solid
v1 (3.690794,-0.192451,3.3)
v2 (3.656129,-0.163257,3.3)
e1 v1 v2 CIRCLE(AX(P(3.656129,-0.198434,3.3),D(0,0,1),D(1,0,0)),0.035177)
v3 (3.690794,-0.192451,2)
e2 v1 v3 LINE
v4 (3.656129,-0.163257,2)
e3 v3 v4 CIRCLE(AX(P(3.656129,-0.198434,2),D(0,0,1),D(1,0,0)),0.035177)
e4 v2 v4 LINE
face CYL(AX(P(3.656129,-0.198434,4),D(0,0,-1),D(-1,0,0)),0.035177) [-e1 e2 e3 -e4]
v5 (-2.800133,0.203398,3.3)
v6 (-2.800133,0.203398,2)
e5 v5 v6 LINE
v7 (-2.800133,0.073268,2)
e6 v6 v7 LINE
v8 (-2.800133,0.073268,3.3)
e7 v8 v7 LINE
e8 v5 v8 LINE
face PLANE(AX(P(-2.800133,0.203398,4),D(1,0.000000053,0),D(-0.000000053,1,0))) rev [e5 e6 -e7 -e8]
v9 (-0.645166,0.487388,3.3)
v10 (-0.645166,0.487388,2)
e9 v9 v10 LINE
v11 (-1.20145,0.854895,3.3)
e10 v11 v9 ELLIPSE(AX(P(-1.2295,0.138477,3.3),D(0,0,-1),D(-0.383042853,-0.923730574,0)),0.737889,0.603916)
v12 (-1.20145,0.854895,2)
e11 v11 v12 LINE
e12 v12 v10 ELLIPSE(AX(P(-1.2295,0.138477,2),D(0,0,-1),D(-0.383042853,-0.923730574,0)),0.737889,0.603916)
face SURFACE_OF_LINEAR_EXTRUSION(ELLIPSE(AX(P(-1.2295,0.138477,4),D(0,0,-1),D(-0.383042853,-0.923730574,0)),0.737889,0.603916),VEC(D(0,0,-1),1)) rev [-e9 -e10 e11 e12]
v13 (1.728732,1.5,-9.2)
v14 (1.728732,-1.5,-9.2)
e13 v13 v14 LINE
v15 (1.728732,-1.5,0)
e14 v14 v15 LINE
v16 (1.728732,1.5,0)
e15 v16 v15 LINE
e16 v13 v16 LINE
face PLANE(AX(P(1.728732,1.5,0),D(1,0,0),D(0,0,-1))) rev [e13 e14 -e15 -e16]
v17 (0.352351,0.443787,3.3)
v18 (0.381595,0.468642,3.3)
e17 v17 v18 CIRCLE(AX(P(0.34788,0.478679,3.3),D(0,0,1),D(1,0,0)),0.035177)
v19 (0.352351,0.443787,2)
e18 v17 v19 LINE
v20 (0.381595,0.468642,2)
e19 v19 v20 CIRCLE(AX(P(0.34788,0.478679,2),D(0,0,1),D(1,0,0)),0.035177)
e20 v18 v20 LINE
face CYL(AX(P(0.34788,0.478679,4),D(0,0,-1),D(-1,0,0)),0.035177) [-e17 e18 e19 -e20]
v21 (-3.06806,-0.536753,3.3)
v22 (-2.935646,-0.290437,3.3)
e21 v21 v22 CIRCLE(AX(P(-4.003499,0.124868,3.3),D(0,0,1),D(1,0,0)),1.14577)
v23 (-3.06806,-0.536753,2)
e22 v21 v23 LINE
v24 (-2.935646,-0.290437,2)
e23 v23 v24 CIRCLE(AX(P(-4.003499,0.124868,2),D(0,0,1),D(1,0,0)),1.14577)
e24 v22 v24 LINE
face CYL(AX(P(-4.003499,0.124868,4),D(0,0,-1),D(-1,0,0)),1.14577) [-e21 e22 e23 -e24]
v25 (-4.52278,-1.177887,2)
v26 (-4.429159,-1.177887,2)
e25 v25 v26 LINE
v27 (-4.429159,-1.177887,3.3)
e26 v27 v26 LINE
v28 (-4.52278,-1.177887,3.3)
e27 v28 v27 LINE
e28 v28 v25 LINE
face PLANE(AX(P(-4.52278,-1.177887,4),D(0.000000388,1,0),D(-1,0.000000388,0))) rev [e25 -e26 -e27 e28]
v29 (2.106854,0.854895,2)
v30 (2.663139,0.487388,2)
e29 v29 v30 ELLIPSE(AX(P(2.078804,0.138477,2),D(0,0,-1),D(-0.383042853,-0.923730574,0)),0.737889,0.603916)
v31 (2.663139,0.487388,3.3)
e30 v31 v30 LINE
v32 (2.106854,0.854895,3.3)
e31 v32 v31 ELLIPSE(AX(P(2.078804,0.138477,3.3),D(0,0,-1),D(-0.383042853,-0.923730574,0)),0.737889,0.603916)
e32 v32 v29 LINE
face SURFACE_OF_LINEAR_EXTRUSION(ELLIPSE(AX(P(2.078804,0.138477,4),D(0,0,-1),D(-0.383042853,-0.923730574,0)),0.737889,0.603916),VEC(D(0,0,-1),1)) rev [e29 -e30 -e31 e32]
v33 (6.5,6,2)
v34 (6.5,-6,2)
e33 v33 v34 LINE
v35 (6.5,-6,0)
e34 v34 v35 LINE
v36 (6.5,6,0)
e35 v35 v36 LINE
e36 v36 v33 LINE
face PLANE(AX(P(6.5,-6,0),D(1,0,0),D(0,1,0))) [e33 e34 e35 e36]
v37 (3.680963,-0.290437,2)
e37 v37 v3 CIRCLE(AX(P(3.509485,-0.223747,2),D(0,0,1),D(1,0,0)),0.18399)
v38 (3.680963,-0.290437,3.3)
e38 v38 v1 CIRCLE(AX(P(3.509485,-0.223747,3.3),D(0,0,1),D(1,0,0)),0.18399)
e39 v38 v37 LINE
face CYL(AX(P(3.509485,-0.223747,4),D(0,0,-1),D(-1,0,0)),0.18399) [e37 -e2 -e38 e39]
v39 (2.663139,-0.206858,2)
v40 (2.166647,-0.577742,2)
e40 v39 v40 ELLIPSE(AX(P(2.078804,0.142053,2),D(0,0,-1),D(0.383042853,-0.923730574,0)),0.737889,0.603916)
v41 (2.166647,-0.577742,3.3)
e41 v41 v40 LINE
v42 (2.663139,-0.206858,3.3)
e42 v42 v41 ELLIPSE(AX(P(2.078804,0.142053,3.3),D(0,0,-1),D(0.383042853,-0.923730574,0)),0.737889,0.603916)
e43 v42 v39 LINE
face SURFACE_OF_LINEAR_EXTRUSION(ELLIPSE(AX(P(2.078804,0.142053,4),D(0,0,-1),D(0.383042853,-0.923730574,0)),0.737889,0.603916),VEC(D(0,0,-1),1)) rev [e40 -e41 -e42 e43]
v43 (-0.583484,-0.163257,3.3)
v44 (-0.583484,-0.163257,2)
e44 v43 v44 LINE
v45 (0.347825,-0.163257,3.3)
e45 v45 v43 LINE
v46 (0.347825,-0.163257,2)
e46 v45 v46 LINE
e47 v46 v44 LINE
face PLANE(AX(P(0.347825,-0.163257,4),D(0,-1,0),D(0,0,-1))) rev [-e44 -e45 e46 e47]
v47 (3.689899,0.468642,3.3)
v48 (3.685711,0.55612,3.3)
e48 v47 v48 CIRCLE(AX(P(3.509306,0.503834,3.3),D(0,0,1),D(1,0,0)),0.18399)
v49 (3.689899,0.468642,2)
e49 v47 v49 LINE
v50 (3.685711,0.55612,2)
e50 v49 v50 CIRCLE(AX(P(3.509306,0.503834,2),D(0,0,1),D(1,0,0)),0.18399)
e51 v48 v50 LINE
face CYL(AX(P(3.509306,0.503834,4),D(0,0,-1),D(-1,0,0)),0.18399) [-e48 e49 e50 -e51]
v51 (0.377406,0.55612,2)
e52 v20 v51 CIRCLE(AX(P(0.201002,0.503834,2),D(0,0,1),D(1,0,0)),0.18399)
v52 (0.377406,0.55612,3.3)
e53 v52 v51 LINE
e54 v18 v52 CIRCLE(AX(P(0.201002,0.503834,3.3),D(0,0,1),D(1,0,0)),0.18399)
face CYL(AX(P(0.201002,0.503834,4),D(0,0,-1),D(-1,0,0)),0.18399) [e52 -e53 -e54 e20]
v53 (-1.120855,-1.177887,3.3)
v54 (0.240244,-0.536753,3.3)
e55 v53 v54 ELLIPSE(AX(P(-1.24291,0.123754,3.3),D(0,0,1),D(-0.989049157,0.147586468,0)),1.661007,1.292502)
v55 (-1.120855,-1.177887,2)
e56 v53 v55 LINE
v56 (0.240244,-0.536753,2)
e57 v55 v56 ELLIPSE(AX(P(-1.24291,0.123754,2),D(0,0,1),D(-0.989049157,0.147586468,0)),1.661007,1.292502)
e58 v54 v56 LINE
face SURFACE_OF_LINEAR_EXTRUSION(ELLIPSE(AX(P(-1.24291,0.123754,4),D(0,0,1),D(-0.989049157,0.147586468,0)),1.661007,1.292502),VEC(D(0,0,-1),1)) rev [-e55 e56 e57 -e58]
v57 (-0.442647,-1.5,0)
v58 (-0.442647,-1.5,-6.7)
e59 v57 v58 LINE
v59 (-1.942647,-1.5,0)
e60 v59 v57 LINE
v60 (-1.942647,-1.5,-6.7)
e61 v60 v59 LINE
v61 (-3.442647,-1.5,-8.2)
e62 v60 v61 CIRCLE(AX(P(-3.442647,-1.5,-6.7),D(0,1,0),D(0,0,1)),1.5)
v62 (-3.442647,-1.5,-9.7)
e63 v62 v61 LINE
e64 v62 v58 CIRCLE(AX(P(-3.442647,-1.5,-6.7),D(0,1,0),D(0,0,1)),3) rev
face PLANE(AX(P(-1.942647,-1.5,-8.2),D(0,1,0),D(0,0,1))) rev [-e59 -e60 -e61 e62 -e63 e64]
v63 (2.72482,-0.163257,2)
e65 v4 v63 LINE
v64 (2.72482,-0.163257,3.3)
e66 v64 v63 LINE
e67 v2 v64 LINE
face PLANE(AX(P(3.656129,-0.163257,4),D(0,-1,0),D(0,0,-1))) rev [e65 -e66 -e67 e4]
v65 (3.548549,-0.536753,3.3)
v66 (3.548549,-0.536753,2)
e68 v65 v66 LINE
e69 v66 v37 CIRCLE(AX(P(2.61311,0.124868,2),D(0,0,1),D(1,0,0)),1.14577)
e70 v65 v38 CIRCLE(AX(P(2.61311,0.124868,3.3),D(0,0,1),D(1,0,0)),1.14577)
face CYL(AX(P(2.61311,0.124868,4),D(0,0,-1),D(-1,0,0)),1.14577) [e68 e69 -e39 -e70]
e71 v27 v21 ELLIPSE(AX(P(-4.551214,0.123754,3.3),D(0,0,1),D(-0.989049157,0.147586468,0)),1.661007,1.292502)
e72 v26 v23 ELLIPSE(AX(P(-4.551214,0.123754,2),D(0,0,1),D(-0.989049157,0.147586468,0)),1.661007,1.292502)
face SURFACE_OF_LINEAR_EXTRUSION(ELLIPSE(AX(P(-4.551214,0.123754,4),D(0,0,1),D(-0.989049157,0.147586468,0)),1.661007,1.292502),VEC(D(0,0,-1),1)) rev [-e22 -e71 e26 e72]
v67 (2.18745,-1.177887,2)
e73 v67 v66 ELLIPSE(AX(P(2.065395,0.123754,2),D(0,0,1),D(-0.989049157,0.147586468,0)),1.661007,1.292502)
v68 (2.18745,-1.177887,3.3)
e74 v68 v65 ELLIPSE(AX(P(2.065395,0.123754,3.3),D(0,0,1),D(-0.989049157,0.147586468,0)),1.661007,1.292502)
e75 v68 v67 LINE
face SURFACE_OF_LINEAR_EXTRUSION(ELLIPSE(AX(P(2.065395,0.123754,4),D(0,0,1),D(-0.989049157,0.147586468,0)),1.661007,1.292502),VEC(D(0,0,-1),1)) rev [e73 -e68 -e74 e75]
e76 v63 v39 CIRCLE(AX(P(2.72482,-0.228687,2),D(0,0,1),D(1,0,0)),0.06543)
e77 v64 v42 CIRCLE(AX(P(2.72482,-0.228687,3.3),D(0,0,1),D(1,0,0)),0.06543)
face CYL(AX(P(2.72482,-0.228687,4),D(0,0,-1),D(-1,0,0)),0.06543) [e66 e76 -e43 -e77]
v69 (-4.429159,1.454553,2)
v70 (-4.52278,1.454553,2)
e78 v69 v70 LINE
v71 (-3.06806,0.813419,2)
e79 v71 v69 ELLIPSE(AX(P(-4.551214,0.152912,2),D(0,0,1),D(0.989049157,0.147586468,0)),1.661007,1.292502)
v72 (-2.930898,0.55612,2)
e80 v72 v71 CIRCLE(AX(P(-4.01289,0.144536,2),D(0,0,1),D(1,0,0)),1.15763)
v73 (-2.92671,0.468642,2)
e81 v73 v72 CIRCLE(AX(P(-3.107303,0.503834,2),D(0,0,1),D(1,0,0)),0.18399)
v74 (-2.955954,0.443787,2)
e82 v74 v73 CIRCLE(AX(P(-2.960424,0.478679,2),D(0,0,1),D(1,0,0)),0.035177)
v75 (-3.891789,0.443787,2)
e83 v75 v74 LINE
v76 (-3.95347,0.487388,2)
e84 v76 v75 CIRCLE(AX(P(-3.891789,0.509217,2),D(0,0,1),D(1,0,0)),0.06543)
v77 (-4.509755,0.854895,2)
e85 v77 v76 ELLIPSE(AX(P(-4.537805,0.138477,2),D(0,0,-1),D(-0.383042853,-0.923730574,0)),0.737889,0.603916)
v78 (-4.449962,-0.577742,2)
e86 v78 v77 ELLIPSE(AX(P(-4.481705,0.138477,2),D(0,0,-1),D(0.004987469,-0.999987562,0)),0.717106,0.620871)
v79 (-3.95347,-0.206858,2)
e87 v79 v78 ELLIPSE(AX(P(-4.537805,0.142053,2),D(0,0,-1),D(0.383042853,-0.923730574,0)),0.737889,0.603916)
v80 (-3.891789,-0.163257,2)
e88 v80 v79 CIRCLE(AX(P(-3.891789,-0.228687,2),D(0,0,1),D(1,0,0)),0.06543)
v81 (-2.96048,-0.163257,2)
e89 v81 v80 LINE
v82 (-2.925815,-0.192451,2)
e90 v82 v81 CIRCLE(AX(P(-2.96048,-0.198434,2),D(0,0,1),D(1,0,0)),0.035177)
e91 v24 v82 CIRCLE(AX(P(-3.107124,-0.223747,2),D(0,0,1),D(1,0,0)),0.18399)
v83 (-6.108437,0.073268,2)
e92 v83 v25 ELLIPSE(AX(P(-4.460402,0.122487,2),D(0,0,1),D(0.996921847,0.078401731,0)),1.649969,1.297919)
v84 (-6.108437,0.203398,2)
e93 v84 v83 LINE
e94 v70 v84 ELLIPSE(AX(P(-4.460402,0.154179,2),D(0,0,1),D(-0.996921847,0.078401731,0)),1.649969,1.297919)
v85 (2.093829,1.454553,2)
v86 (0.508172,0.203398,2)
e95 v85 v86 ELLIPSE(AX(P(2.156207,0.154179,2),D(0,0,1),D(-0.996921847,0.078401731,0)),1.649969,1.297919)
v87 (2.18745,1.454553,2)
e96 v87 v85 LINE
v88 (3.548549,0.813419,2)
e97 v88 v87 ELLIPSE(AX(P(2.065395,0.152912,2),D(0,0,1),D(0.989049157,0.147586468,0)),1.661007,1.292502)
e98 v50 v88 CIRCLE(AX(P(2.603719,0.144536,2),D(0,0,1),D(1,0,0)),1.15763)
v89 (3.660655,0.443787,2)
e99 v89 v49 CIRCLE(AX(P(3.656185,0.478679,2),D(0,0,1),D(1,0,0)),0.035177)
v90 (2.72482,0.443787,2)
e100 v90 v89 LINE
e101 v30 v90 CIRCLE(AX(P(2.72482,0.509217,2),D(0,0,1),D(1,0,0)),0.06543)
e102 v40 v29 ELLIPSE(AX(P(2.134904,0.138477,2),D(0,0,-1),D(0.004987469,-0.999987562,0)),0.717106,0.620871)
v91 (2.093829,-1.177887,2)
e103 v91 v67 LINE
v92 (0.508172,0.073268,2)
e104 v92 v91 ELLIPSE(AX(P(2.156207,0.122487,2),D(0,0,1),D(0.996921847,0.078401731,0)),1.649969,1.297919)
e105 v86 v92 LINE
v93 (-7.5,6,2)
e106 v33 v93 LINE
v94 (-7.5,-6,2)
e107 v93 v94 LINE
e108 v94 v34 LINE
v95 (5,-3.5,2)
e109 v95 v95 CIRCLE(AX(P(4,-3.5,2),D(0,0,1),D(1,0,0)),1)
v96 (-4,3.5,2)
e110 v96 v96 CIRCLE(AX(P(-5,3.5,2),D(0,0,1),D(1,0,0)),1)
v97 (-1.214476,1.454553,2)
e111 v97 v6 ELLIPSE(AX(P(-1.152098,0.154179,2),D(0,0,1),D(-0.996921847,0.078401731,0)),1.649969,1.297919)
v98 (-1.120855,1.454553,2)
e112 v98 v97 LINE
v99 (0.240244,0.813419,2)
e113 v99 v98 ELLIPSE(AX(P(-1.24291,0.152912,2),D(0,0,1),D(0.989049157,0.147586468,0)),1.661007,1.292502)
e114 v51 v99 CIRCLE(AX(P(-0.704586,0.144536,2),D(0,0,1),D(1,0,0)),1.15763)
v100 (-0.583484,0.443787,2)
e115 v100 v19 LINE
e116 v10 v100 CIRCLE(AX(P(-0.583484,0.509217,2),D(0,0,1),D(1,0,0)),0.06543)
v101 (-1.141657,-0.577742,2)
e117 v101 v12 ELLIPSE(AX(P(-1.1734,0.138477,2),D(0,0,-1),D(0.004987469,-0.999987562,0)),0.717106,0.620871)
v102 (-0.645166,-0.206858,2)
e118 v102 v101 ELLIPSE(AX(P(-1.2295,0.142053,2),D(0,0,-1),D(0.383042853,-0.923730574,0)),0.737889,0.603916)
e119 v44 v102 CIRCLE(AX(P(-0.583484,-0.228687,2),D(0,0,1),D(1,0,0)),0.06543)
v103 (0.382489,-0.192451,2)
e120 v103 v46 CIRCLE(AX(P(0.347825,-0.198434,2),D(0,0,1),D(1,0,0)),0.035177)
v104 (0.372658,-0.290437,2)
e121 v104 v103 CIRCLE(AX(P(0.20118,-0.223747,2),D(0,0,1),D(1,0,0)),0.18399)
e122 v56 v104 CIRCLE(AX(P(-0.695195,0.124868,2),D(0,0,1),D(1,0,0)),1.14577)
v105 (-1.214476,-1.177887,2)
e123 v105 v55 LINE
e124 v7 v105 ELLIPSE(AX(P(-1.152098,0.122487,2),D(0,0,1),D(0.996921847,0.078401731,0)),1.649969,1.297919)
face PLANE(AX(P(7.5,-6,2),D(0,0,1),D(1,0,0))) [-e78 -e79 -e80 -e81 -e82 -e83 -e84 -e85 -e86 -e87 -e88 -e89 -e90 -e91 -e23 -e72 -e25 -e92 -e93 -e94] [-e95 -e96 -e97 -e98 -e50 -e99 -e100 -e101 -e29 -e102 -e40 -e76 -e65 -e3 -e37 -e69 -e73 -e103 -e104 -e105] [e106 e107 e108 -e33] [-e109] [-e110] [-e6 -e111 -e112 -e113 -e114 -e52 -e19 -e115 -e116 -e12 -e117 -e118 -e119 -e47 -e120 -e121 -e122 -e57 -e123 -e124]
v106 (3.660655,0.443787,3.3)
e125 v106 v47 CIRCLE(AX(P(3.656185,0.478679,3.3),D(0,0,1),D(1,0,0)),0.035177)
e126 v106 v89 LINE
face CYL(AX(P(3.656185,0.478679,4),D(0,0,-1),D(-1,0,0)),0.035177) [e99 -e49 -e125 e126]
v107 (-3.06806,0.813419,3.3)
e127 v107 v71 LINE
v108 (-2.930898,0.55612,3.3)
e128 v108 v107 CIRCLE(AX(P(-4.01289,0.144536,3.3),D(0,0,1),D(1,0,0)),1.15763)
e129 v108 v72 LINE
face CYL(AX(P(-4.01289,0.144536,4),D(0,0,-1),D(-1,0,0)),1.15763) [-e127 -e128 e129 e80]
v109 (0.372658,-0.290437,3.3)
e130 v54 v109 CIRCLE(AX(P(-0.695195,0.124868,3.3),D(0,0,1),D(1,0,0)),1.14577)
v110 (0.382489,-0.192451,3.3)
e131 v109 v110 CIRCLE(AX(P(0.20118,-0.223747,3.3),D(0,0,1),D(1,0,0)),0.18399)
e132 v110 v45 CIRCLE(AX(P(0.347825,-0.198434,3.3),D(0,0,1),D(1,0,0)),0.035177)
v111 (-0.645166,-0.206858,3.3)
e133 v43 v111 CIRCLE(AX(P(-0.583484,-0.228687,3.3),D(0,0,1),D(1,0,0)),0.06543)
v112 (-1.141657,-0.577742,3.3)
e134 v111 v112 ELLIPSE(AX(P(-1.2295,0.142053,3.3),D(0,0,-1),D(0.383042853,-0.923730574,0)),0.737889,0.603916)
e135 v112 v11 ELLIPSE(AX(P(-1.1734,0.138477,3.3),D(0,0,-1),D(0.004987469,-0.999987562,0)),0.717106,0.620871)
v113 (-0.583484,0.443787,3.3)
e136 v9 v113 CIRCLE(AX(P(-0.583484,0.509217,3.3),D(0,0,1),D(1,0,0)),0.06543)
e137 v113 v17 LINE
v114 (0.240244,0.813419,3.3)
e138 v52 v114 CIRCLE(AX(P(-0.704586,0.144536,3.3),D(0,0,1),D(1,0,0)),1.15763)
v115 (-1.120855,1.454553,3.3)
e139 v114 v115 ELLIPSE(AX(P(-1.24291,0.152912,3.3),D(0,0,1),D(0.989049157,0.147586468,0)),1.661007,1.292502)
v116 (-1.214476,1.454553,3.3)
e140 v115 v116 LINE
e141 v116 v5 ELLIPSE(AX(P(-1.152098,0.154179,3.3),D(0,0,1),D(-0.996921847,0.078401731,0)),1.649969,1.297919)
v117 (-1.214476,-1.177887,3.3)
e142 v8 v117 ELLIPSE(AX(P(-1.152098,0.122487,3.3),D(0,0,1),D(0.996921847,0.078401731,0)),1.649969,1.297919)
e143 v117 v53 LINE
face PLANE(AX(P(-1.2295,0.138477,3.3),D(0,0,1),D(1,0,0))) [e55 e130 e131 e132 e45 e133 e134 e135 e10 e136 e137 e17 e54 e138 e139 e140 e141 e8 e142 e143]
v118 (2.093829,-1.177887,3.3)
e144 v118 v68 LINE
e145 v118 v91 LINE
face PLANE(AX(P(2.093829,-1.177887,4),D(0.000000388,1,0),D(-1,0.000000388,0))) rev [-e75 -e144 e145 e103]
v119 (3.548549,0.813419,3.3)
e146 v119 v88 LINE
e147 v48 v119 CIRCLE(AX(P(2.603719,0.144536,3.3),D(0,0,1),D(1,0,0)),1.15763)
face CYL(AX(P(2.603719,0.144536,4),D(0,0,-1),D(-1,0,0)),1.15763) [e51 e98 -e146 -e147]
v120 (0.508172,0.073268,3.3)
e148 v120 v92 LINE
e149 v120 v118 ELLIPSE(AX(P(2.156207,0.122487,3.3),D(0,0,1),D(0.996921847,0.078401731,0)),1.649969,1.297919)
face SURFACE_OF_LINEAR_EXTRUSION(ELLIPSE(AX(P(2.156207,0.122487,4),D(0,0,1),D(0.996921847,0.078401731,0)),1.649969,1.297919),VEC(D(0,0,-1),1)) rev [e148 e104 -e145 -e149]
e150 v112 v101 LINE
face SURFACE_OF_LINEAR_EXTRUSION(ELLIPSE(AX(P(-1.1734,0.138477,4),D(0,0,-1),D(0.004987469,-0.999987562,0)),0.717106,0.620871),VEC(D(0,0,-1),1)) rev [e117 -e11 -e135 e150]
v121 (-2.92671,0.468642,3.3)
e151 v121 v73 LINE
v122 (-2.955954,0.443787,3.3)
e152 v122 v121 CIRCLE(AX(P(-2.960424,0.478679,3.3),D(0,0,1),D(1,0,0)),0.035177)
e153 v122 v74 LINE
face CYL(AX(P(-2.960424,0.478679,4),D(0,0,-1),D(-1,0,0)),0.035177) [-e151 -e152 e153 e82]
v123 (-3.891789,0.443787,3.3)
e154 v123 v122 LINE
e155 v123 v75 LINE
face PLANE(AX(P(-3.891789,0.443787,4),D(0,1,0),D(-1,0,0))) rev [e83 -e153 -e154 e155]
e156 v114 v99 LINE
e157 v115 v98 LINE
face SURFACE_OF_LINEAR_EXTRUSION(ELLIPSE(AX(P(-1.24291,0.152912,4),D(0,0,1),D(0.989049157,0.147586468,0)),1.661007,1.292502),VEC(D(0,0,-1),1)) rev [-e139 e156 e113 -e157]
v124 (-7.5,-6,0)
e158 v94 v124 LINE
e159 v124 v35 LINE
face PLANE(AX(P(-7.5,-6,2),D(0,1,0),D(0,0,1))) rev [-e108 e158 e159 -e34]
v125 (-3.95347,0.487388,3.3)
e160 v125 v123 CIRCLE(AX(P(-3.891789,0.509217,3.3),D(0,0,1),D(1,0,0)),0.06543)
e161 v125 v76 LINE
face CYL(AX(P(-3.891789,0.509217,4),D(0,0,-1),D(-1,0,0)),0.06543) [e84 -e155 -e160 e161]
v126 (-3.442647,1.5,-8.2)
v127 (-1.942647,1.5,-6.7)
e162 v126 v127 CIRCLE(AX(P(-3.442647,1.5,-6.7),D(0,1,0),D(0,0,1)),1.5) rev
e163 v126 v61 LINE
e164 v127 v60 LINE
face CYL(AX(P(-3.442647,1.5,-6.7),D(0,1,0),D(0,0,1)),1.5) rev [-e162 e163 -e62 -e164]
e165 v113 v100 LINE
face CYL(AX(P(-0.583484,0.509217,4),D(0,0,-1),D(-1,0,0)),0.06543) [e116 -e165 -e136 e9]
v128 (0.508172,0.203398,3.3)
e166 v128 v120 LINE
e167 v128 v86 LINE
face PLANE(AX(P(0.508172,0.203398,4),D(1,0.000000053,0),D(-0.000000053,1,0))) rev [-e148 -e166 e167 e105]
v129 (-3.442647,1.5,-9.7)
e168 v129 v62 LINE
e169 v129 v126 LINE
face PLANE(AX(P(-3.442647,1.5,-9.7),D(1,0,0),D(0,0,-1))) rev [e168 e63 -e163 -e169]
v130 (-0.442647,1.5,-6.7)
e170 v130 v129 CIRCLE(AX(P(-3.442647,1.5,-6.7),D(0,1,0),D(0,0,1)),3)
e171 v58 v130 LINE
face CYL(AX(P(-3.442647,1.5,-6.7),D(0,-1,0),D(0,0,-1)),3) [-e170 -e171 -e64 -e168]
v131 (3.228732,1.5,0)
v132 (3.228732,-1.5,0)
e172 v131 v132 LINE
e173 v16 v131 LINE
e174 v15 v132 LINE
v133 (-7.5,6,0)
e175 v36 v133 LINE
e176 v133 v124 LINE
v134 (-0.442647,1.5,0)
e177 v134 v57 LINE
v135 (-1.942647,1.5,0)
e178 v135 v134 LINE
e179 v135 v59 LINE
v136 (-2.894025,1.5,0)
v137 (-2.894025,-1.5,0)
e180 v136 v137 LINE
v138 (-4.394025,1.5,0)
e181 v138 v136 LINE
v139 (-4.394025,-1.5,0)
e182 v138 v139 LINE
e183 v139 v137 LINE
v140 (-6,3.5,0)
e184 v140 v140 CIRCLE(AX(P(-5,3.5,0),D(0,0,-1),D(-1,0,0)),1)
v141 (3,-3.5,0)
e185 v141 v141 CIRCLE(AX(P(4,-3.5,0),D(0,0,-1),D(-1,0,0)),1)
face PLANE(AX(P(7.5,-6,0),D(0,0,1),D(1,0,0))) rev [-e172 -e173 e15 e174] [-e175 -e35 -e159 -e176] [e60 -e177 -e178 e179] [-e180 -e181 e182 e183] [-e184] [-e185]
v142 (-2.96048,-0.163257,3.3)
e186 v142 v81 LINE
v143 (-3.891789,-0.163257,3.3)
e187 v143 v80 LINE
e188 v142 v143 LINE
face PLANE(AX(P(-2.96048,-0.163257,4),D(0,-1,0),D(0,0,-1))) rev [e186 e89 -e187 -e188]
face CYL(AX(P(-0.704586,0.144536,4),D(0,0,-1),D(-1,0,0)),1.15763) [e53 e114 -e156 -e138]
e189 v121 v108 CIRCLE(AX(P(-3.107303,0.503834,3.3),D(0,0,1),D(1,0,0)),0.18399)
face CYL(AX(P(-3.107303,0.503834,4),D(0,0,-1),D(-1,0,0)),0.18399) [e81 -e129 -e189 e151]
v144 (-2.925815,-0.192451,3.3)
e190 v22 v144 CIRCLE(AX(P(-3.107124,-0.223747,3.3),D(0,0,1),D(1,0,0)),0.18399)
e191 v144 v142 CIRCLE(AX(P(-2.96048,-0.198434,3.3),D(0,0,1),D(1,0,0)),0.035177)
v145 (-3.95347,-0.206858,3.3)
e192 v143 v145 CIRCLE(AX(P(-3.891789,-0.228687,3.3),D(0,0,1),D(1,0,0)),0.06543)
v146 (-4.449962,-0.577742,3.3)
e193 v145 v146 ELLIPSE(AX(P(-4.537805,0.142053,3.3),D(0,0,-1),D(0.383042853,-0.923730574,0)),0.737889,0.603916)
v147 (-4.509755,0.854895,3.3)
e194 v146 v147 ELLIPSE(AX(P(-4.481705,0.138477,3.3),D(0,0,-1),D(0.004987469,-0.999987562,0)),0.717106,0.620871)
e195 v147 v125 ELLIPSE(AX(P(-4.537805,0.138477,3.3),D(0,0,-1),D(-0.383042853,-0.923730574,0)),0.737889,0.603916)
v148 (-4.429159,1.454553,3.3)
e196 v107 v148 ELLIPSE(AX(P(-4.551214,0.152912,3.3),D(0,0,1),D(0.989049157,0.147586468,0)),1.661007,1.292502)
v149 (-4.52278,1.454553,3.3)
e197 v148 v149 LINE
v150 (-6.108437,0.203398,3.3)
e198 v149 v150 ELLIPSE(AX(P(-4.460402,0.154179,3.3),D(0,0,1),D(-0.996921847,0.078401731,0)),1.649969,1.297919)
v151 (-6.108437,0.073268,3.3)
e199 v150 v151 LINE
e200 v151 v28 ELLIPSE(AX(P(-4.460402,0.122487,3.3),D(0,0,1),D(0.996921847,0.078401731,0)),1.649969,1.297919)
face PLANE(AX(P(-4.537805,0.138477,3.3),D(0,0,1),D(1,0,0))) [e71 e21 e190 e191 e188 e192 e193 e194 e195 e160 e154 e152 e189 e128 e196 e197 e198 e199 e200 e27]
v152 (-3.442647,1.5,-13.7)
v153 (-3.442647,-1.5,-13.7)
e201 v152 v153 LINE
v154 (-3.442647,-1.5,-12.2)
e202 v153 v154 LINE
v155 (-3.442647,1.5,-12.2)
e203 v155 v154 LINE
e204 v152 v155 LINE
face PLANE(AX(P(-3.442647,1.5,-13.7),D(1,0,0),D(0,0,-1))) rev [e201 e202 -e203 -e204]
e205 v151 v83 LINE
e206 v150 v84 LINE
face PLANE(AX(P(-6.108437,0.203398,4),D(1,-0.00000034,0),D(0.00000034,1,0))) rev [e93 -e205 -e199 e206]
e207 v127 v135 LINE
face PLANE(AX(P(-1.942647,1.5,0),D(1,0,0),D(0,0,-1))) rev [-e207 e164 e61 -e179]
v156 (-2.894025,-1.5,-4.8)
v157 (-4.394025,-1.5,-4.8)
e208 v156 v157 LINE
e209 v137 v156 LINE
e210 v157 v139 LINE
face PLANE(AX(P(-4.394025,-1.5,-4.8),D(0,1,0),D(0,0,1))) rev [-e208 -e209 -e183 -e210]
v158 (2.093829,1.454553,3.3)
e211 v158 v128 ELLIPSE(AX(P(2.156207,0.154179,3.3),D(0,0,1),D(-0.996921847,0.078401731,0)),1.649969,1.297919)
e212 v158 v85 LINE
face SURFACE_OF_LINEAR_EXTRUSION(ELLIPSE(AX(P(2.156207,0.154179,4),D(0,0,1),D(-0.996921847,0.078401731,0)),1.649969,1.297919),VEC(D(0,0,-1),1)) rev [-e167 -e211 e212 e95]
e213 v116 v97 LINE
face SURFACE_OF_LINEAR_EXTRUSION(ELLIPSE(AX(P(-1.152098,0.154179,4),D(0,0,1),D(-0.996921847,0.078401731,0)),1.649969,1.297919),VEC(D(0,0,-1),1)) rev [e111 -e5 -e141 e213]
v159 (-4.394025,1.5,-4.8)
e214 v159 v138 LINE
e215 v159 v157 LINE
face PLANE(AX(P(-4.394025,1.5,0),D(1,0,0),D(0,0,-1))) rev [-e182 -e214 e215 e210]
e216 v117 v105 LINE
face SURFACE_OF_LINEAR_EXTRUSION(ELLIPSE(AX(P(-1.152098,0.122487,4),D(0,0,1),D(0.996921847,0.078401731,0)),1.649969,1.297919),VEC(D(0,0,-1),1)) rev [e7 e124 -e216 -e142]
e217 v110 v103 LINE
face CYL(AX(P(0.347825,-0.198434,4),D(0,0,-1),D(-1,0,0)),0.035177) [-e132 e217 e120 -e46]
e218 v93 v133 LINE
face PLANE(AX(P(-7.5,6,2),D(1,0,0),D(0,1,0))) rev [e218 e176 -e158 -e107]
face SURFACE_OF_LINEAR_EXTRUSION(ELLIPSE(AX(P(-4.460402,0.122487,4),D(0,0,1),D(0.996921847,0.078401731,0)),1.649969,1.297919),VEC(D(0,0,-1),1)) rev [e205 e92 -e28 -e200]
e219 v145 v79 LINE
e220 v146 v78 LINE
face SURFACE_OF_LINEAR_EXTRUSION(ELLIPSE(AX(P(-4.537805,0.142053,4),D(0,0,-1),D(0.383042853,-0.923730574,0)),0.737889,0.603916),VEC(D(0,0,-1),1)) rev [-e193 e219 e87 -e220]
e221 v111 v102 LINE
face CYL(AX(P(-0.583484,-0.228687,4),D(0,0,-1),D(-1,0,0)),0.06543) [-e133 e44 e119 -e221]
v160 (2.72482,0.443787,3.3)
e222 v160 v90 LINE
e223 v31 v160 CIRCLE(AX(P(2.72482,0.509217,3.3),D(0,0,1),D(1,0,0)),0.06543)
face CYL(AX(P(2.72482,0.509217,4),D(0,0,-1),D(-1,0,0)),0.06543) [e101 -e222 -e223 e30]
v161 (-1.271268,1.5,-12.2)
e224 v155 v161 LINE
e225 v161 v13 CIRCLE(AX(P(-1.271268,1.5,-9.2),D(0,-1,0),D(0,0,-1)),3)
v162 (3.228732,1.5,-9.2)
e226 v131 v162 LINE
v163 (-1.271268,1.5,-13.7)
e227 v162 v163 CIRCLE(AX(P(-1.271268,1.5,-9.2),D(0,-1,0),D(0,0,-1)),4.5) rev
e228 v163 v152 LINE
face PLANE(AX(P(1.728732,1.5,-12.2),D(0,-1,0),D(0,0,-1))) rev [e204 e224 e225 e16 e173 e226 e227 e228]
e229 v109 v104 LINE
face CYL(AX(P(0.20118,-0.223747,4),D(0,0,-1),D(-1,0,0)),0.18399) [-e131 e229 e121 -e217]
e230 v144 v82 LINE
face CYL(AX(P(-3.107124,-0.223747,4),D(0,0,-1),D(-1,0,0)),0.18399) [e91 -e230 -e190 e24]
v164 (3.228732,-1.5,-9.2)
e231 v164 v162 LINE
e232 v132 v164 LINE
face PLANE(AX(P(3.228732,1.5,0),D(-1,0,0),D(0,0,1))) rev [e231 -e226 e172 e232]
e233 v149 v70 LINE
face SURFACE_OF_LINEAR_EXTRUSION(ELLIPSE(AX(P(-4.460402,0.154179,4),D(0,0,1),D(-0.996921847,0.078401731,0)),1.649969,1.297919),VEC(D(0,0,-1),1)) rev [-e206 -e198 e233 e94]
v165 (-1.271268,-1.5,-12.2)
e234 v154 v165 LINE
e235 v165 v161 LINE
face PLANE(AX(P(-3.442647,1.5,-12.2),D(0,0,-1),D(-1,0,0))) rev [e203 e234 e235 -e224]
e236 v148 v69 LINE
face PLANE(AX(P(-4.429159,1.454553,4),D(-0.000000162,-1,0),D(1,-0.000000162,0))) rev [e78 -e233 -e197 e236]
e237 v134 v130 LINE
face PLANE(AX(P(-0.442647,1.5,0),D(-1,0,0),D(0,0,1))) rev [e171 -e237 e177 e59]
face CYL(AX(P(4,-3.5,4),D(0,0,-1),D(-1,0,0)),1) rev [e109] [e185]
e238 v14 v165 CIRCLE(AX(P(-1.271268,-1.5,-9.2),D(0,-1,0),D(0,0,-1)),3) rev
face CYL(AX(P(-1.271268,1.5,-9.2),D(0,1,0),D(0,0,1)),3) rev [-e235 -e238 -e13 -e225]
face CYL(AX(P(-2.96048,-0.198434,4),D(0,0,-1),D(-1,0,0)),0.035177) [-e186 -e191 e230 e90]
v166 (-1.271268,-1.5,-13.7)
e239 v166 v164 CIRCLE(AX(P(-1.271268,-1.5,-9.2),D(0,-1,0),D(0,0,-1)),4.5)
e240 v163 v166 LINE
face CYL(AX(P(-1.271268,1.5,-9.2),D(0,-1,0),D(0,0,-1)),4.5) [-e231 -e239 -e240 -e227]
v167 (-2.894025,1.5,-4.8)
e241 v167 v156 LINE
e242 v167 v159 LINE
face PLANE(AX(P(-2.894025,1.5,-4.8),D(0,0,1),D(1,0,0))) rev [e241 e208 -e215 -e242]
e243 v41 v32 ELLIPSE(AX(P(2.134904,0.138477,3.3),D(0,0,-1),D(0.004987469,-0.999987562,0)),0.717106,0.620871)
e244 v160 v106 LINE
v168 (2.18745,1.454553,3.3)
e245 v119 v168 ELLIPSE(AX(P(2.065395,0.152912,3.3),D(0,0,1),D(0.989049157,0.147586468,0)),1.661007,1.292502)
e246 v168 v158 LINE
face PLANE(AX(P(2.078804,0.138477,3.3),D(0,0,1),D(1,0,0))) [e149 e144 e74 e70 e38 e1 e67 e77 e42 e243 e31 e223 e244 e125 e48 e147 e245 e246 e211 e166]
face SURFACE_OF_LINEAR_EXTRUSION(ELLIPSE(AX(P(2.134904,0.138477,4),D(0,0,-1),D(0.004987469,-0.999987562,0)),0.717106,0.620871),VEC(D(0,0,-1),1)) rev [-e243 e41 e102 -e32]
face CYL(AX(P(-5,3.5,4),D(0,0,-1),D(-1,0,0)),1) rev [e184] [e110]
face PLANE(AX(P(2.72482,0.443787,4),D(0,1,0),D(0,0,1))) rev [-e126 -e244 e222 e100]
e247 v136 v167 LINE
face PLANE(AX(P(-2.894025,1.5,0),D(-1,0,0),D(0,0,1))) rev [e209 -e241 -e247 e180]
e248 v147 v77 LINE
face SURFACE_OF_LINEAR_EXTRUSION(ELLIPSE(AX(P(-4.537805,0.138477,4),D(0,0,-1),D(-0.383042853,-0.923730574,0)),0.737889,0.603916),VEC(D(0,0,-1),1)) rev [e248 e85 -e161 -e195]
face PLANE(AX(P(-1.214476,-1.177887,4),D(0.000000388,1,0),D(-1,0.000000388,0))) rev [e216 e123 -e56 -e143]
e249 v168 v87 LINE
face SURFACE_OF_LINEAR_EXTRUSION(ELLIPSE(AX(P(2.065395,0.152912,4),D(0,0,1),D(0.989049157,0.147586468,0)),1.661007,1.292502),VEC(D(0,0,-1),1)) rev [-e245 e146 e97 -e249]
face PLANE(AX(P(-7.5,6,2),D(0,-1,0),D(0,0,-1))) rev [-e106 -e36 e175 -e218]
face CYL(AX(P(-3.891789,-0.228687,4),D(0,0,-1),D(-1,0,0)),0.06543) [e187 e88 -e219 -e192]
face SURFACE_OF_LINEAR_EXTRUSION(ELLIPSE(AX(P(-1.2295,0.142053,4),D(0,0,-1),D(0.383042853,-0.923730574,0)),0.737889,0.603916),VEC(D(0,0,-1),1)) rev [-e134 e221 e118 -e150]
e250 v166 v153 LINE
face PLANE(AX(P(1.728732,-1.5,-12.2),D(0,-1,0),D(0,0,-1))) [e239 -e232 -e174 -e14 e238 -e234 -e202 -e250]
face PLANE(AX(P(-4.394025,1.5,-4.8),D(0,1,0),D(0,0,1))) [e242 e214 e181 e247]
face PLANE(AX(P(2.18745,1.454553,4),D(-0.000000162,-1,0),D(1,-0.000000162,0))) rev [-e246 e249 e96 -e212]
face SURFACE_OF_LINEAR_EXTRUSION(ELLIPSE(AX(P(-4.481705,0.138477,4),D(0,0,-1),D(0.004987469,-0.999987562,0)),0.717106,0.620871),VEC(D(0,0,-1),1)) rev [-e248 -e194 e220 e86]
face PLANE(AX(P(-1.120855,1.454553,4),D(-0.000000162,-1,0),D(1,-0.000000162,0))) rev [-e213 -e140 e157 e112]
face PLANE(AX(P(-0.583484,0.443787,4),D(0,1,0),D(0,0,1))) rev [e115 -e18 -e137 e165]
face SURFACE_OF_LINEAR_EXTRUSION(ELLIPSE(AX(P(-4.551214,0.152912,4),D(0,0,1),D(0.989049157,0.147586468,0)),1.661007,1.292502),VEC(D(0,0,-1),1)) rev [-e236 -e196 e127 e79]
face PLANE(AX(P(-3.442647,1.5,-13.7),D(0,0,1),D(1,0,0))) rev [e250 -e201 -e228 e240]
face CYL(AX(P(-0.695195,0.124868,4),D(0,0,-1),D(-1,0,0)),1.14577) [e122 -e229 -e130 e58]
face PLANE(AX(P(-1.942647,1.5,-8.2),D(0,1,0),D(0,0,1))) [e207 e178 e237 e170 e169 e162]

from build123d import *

# Parameters (mm, degrees)
SKETCH1_W           = 15
SKETCH1_H           = 12
BOSS_EXTRUDE1_DEPTH = 2
BOSS_EXTRUDE2_DEPTH = 2
SKETCH3_W           = 1.5
SKETCH3_H           = 4.8
BOSS_EXTRUDE3_DEPTH = 1.5
FILLET3_R           = 1.5
FILLET4_R           = 3
FILLET5_R           = 3
FILLET6_R           = 4.5
SKETCH4_W           = 2
SKETCH4_H           = 12
CUT_EXTRUDE1_DEPTH  = 1
SKETCH5_R           = 1
CUT_EXTRUDE2_DEPTH  = 17.731407672
CUT_EXTRUDE3_START  = -0.7
CUT_EXTRUDE3_DEPTH  = 0.7


with BuildPart() as part:
    # Sketch1 → Boss-Extrude1 (new body)
    with BuildSketch(Plane.XY):
        Rectangle(SKETCH1_W, SKETCH1_H)
    extrude(amount=BOSS_EXTRUDE1_DEPTH)

    # Sketch2 → Boss-Extrude2 (add)
    with BuildSketch(Plane.XY.offset(2)):
        with BuildLine():
            Line((-0.583484164, 0.443787032), (0.352350759, 0.443787032))
            ThreePointArc((0.352350759, 0.443787032), (0.370660979, 0.451874829), (0.381594807, 0.468641703))
            ThreePointArc((0.381594807, 0.468641703), (0.38478126, 0.512633483), (0.377406248, 0.556119567))
            ThreePointArc((0.377406248, 0.556119567), (0.316958398, 0.689104808), (0.240244136, 0.81341868))
            add(Edge.make_bspline(
                [(0.240244136, 0.81341868), (-0.178053426, 1.454553053), (-1.120854898, 1.454553053)],
                knots=[3.484341046, 3.484341046, 3.484341046, 4.522924348, 4.522924348, 4.522924348], degree=2, weights=[1, 0.868170926, 1]))
            Line((-1.120854898, 1.454553053), (-1.214475951, 1.454553068))
            add(Edge.make_bspline(
                [(-1.214475951, 1.454553068), (-2.800132813, 1.454553068), (-2.800132813, 0.203397992)],
                knots=[1.670440536, 1.670440536, 1.670440536, 3.203377674, 3.203377674, 3.203377674], degree=2, weights=[1, 0.720364542, 1]))
            Line((-2.800132813, 0.203397992), (-2.800132806, 0.073267738))
            add(Edge.make_bspline(
                [(-2.800132806, 0.073267738), (-2.800132806, -1.177887338), (-1.214475944, -1.177887338)],
                knots=[3.079807634, 3.079807634, 3.079807634, 4.612744771, 4.612744771, 4.612744771], degree=2, weights=[1, 0.720364542, 1]))
            Line((-1.214475944, -1.177887338), (-1.120854891, -1.177887375))
            add(Edge.make_bspline(
                [(-1.120854891, -1.177887375), (-0.178053419, -1.177887375), (0.240244143, -0.536753002)],
                knots=[1.760260959, 1.760260959, 1.760260959, 2.798844261, 2.798844261, 2.798844261], degree=2, weights=[1, 0.868170926, 1]))
            ThreePointArc((0.240244143, -0.536753002), (0.313994237, -0.417650167), (0.372658208, -0.290437354))
            ThreePointArc((0.372658208, -0.290437354), (0.384251196, -0.24211404), (0.382489087, -0.192450825))
            ThreePointArc((0.382489087, -0.192450825), (0.370484527, -0.171527836), (0.347824512, -0.163257123))
            Line((0.347824512, -0.163257123), (-0.58348421, -0.163257123))
            ThreePointArc((-0.58348421, -0.163257123), (-0.62125204, -0.175257922), (-0.645165579, -0.206858093))
            add(Edge.make_bspline(
                [(-1.141657158, -0.577741646), (-0.776549247, -0.578100851), (-0.645165579, -0.206858093)],
                knots=[5.955155363, 5.955155363, 5.955155363, 7.020735545, 7.020735545, 7.020735545], degree=2, weights=[1, 0.86139323, 1]))
            add(Edge.make_bspline(
                [(-1.201450314, 0.854894524), (-1.823540048, 0.823436889), (-1.793554178, 0.104979402), (-1.763568309, -0.613478086), (-1.141657158, -0.577741646)],
                knots=[0.039432941, 0.039432941, 0.039432941, 1.613207044, 1.613207044, 3.186981147, 3.186981147, 3.186981147], degree=2, weights=[1, 0.706053195, 1, 0.706053195, 1]))
            add(Edge.make_bspline(
                [(-0.645165584, 0.487388037), (-0.79140441, 0.900606071), (-1.201450314, 0.854894524)],
                knots=[2.404042441, 2.404042441, 2.404042441, 3.565685694, 3.565685694, 3.565685694], degree=2, weights=[1, 0.836012096, 1]))
            ThreePointArc((-0.645165584, 0.487388037), (-0.621252025, 0.455787841), (-0.583484164, 0.443787032))
        make_face()
        with BuildLine():
            Line((-3.89178871, 0.443787032), (-2.955953786, 0.443787032))
            ThreePointArc((-2.955953786, 0.443787032), (-2.937643536, 0.451874816), (-2.926709688, 0.468641703))
            ThreePointArc((-2.926709688, 0.468641703), (-2.923523234, 0.512633483), (-2.930898247, 0.556119567))
            ThreePointArc((-2.930898247, 0.556119567), (-2.991346096, 0.689104808), (-3.068060358, 0.81341868))
            add(Edge.make_bspline(
                [(-3.068060358, 0.81341868), (-3.48635792, 1.454553053), (-4.429159392, 1.454553053)],
                knots=[3.484341046, 3.484341046, 3.484341046, 4.522924348, 4.522924348, 4.522924348], degree=2, weights=[1, 0.868170926, 1]))
            Line((-4.429159392, 1.454553053), (-4.522780446, 1.454553068))
            add(Edge.make_bspline(
                [(-4.522780446, 1.454553068), (-6.108437307, 1.454553068), (-6.108437307, 0.203397992)],
                knots=[4.81203319, 4.81203319, 4.81203319, 6.344970327, 6.344970327, 6.344970327], degree=2, weights=[1, 0.720364542, 1]))
            Line((-6.108437307, 0.203397992), (-6.108437352, 0.073267738))
            add(Edge.make_bspline(
                [(-6.108437352, 0.073267738), (-6.108437352, -1.177887338), (-4.52278049, -1.177887338)],
                knots=[6.221400287, 6.221400287, 6.221400287, 7.754337425, 7.754337425, 7.754337425], degree=2, weights=[1, 0.720364542, 1]))
            Line((-4.52278049, -1.177887338), (-4.429159437, -1.177887375))
            add(Edge.make_bspline(
                [(-4.429159437, -1.177887375), (-3.486357965, -1.177887375), (-3.068060402, -0.536753002)],
                knots=[1.760260959, 1.760260959, 1.760260959, 2.798844261, 2.798844261, 2.798844261], degree=2, weights=[1, 0.868170926, 1]))
            ThreePointArc((-3.068060402, -0.536753002), (-2.994310308, -0.417650167), (-2.935646337, -0.290437354))
            ThreePointArc((-2.935646337, -0.290437354), (-2.92405335, -0.24211404), (-2.925815458, -0.192450825))
            ThreePointArc((-2.925815458, -0.192450825), (-2.937820019, -0.171527836), (-2.960480033, -0.163257123))
            Line((-2.960480033, -0.163257123), (-3.891788755, -0.163257123))
            ThreePointArc((-3.891788755, -0.163257123), (-3.929556585, -0.175257922), (-3.953470124, -0.206858093))
            add(Edge.make_bspline(
                [(-4.449961703, -0.577741646), (-4.084853792, -0.578100851), (-3.953470124, -0.206858093)],
                knots=[5.955155363, 5.955155363, 5.955155363, 7.020735545, 7.020735545, 7.020735545], degree=2, weights=[1, 0.86139323, 1]))
            add(Edge.make_bspline(
                [(-4.509754859, 0.854894524), (-5.131844593, 0.82343689), (-5.101858724, 0.104979402), (-5.071872854, -0.613478086), (-4.449961703, -0.577741646)],
                knots=[0.039432941, 0.039432941, 0.039432941, 1.613207044, 1.613207044, 3.186981147, 3.186981147, 3.186981147], degree=2, weights=[1, 0.706053195, 1, 0.706053195, 1]))
            add(Edge.make_bspline(
                [(-3.95347013, 0.487388037), (-4.099708956, 0.900606071), (-4.509754859, 0.854894524)],
                knots=[2.40404244, 2.40404244, 2.40404244, 3.565685694, 3.565685694, 3.565685694], degree=2, weights=[1, 0.836012096, 1]))
            ThreePointArc((-3.95347013, 0.487388037), (-3.92955657, 0.455787841), (-3.89178871, 0.443787032))
        make_face()
        with BuildLine():
            Line((2.724820382, 0.443787032), (3.660655305, 0.443787032))
            ThreePointArc((3.660655305, 0.443787032), (3.678965525, 0.451874829), (3.689899353, 0.468641703))
            ThreePointArc((3.689899353, 0.468641703), (3.693085806, 0.512633483), (3.685710794, 0.556119567))
            ThreePointArc((3.685710794, 0.556119567), (3.625262944, 0.689104808), (3.548548682, 0.81341868))
            add(Edge.make_bspline(
                [(3.548548682, 0.81341868), (3.13025112, 1.454553053), (2.187449648, 1.454553053)],
                knots=[0.342748392, 0.342748392, 0.342748392, 1.381331695, 1.381331695, 1.381331695], degree=2, weights=[1, 0.868170926, 1]))
            Line((2.187449648, 1.454553053), (2.093828595, 1.454553068))
            add(Edge.make_bspline(
                [(2.093828595, 1.454553068), (0.508171733, 1.454553068), (0.508171733, 0.203397992)],
                knots=[4.81203319, 4.81203319, 4.81203319, 6.344970327, 6.344970327, 6.344970327], degree=2, weights=[1, 0.720364542, 1]))
            Line((0.508171733, 0.203397992), (0.50817174, 0.073267738))
            add(Edge.make_bspline(
                [(0.50817174, 0.073267738), (0.50817174, -1.177887338), (2.093828602, -1.177887338)],
                knots=[3.079807634, 3.079807634, 3.079807634, 4.612744771, 4.612744771, 4.612744771], degree=2, weights=[1, 0.720364542, 1]))
            Line((2.093828602, -1.177887338), (2.187449655, -1.177887375))
            add(Edge.make_bspline(
                [(2.187449655, -1.177887375), (3.130251127, -1.177887375), (3.548548689, -0.536753002)],
                knots=[1.760260959, 1.760260959, 1.760260959, 2.798844261, 2.798844261, 2.798844261], degree=2, weights=[1, 0.868170926, 1]))
            ThreePointArc((3.548548689, -0.536753002), (3.622298783, -0.417650167), (3.680962754, -0.290437354))
            ThreePointArc((3.680962754, -0.290437354), (3.692555742, -0.24211404), (3.690793633, -0.192450825))
            ThreePointArc((3.690793633, -0.192450825), (3.678789073, -0.171527836), (3.656129058, -0.163257123))
            Line((3.656129058, -0.163257123), (2.724820336, -0.163257123))
            ThreePointArc((2.724820336, -0.163257123), (2.687052506, -0.175257922), (2.663138967, -0.206858093))
            add(Edge.make_bspline(
                [(2.166647388, -0.577741646), (2.531755299, -0.578100851), (2.663138967, -0.206858093)],
                knots=[5.955155363, 5.955155363, 5.955155363, 7.020735545, 7.020735545, 7.020735545], degree=2, weights=[1, 0.86139323, 1]))
            add(Edge.make_bspline(
                [(2.106854232, 0.854894524), (1.484764498, 0.823436889), (1.514750368, 0.104979402), (1.544736237, -0.613478086), (2.166647388, -0.577741646)],
                knots=[3.181025595, 3.181025595, 3.181025595, 4.754799698, 4.754799698, 6.328573801, 6.328573801, 6.328573801], degree=2, weights=[1, 0.706053195, 1, 0.706053195, 1]))
            add(Edge.make_bspline(
                [(2.663138962, 0.487388037), (2.516900136, 0.900606071), (2.106854232, 0.854894524)],
                knots=[5.545635094, 5.545635094, 5.545635094, 6.707278348, 6.707278348, 6.707278348], degree=2, weights=[1, 0.836012096, 1]))
            ThreePointArc((2.663138962, 0.487388037), (2.687052521, 0.455787841), (2.724820382, 0.443787032))
        make_face()
    extrude(amount=BOSS_EXTRUDE2_DEPTH)

    # Sketch3 → Boss-Extrude3 (add, symmetric)
    with BuildSketch(Plane(origin=(0, 0, 0), x_dir=(1, 0, 0), z_dir=(0, 1, 0))):
        Polygon((1.72873188, 0), (3.22873188, 0), (3.22873188, 13.7), (-3.442646753, 13.7), (-3.442646753, 12.2), (1.72873188, 12.2), align=None)
        with Locations((-3.644025381, 2.4)):
            Rectangle(SKETCH3_W, SKETCH3_H)
        Polygon((-1.942646753, 0), (-0.442646753, 0), (-0.442646753, 9.7), (-3.442646753, 9.7), (-3.442646753, 8.2), (-1.942646753, 8.2), align=None)
    extrude(amount=BOSS_EXTRUDE3_DEPTH, both=True)

    # Fillet3
    fillet3_edges = [part.edges().sort_by_distance(p)[0] for p in [
        (-1.942646753, 0, -8.2),
    ]]
    fillet(fillet3_edges, radius=FILLET3_R - 0.0001)  # a hair under: the kernel refuses the full size

    # Fillet4
    fillet4_edges = [part.edges().sort_by_distance(p)[0] for p in [
        (-0.442646753, 0, -9.7),
    ]]
    fillet(fillet4_edges, radius=FILLET4_R - 0.0001)  # a hair under: the kernel refuses the full size

    # Fillet5
    fillet5_edges = [part.edges().sort_by_distance(p)[0] for p in [
        (1.72873188, 0, -12.2),
    ]]
    fillet(fillet5_edges, radius=FILLET5_R)

    # Fillet6
    fillet6_edges = [part.edges().sort_by_distance(p)[0] for p in [
        (3.22873188, 0, -13.7),
    ]]
    fillet(fillet6_edges, radius=FILLET6_R)

    # Sketch4 → Cut-Extrude1 (cut)
    with BuildSketch(Plane(origin=(7.5, 0, 0), x_dir=(0, 0, -1), z_dir=(1, 0, 0))):
        with Locations((-1, 0)):
            Rectangle(SKETCH4_W, SKETCH4_H)
    extrude(amount=-CUT_EXTRUDE1_DEPTH, mode=Mode.SUBTRACT)

    # Sketch5 → Cut-Extrude2 (cut, through all)
    with BuildSketch(Plane(origin=(0, 0, 0), x_dir=(-1, 0, 0), z_dir=(0, 0, -1))):
        with Locations((-4, -3.5)):
            Circle(SKETCH5_R)
        with Locations((5, 3.5)):
            Circle(SKETCH5_R)
    extrude(amount=-CUT_EXTRUDE2_DEPTH, mode=Mode.SUBTRACT)

    # Sketch6 → Cut-Extrude3 (cut)
    with BuildSketch(Plane.XY.offset(4).offset(CUT_EXTRUDE3_START)):
        with BuildLine():
            Line((2.724820382, 0.443787032), (3.660655305, 0.443787032))
            ThreePointArc((3.660655305, 0.443787032), (3.678965525, 0.451874829), (3.689899353, 0.468641703))
            ThreePointArc((3.689899353, 0.468641703), (3.693085806, 0.512633483), (3.685710794, 0.556119567))
            ThreePointArc((3.685710794, 0.556119567), (3.625262944, 0.689104808), (3.548548682, 0.81341868))
            add(Edge.make_bspline(
                [(3.548548682, 0.81341868), (3.13025112, 1.454553053), (2.187449648, 1.454553053)],
                knots=[0.342748392, 0.342748392, 0.342748392, 1.381331695, 1.381331695, 1.381331695], degree=2, weights=[1, 0.868170926, 1]))
            Line((2.187449648, 1.454553053), (2.093828595, 1.454553068))
            add(Edge.make_bspline(
                [(2.093828595, 1.454553068), (0.508171733, 1.454553068), (0.508171733, 0.203397992)],
                knots=[4.81203319, 4.81203319, 4.81203319, 6.344970327, 6.344970327, 6.344970327], degree=2, weights=[1, 0.720364542, 1]))
            Line((0.508171733, 0.203397992), (0.50817174, 0.073267738))
            add(Edge.make_bspline(
                [(0.50817174, 0.073267738), (0.50817174, -1.177887338), (2.093828602, -1.177887338)],
                knots=[3.079807634, 3.079807634, 3.079807634, 4.612744771, 4.612744771, 4.612744771], degree=2, weights=[1, 0.720364542, 1]))
            Line((2.093828602, -1.177887338), (2.187449655, -1.177887375))
            add(Edge.make_bspline(
                [(2.187449655, -1.177887375), (3.130251127, -1.177887375), (3.548548689, -0.536753002)],
                knots=[1.760260959, 1.760260959, 1.760260959, 2.798844261, 2.798844261, 2.798844261], degree=2, weights=[1, 0.868170926, 1]))
            ThreePointArc((3.548548689, -0.536753002), (3.622298783, -0.417650167), (3.680962754, -0.290437354))
            ThreePointArc((3.680962754, -0.290437354), (3.692555742, -0.24211404), (3.690793633, -0.192450825))
            ThreePointArc((3.690793633, -0.192450825), (3.678789073, -0.171527836), (3.656129058, -0.163257123))
            Line((3.656129058, -0.163257123), (2.724820336, -0.163257123))
            ThreePointArc((2.724820336, -0.163257123), (2.687052506, -0.175257922), (2.663138967, -0.206858093))
            add(Edge.make_bspline(
                [(2.166647388, -0.577741646), (2.531755299, -0.578100851), (2.663138967, -0.206858093)],
                knots=[5.955155363, 5.955155363, 5.955155363, 7.020735545, 7.020735545, 7.020735545], degree=2, weights=[1, 0.86139323, 1]))
            add(Edge.make_bspline(
                [(2.106854232, 0.854894524), (1.484764498, 0.823436889), (1.514750368, 0.104979402), (1.544736237, -0.613478086), (2.166647388, -0.577741646)],
                knots=[3.181025595, 3.181025595, 3.181025595, 4.754799698, 4.754799698, 6.328573801, 6.328573801, 6.328573801], degree=2, weights=[1, 0.706053195, 1, 0.706053195, 1]))
            add(Edge.make_bspline(
                [(2.663138962, 0.487388037), (2.516900136, 0.900606071), (2.106854232, 0.854894524)],
                knots=[2.404042441, 2.404042441, 2.404042441, 3.565685694, 3.565685694, 3.565685694], degree=2, weights=[1, 0.836012096, 1]))
            ThreePointArc((2.663138962, 0.487388037), (2.687052521, 0.455787841), (2.724820382, 0.443787032))
        make_face()
        with BuildLine():
            Line((-0.583484164, 0.443787032), (0.352350759, 0.443787032))
            ThreePointArc((0.352350759, 0.443787032), (0.370660979, 0.451874829), (0.381594807, 0.468641703))
            ThreePointArc((0.381594807, 0.468641703), (0.38478126, 0.512633483), (0.377406248, 0.556119567))
            ThreePointArc((0.377406248, 0.556119567), (0.316958398, 0.689104808), (0.240244136, 0.81341868))
            add(Edge.make_bspline(
                [(0.240244136, 0.81341868), (-0.178053426, 1.454553053), (-1.120854898, 1.454553053)],
                knots=[0.342748392, 0.342748392, 0.342748392, 1.381331695, 1.381331695, 1.381331695], degree=2, weights=[1, 0.868170926, 1]))
            Line((-1.120854898, 1.454553053), (-1.214475951, 1.454553068))
            add(Edge.make_bspline(
                [(-1.214475951, 1.454553068), (-2.800132813, 1.454553068), (-2.800132813, 0.203397992)],
                knots=[4.81203319, 4.81203319, 4.81203319, 6.344970327, 6.344970327, 6.344970327], degree=2, weights=[1, 0.720364542, 1]))
            Line((-2.800132813, 0.203397992), (-2.800132806, 0.073267738))
            add(Edge.make_bspline(
                [(-2.800132806, 0.073267738), (-2.800132806, -1.177887338), (-1.214475944, -1.177887338)],
                knots=[3.079807634, 3.079807634, 3.079807634, 4.612744771, 4.612744771, 4.612744771], degree=2, weights=[1, 0.720364542, 1]))
            Line((-1.214475944, -1.177887338), (-1.120854891, -1.177887375))
            add(Edge.make_bspline(
                [(-1.120854891, -1.177887375), (-0.178053419, -1.177887375), (0.240244143, -0.536753002)],
                knots=[1.760260959, 1.760260959, 1.760260959, 2.798844261, 2.798844261, 2.798844261], degree=2, weights=[1, 0.868170926, 1]))
            ThreePointArc((0.240244143, -0.536753002), (0.313994237, -0.417650167), (0.372658208, -0.290437354))
            ThreePointArc((0.372658208, -0.290437354), (0.384251196, -0.24211404), (0.382489087, -0.192450825))
            ThreePointArc((0.382489087, -0.192450825), (0.370484527, -0.171527836), (0.347824512, -0.163257123))
            Line((0.347824512, -0.163257123), (-0.58348421, -0.163257123))
            ThreePointArc((-0.58348421, -0.163257123), (-0.62125204, -0.175257922), (-0.645165579, -0.206858093))
            add(Edge.make_bspline(
                [(-1.141657158, -0.577741646), (-0.776549247, -0.578100851), (-0.645165579, -0.206858093)],
                knots=[5.955155363, 5.955155363, 5.955155363, 7.020735545, 7.020735545, 7.020735545], degree=2, weights=[1, 0.86139323, 1]))
            add(Edge.make_bspline(
                [(-1.201450314, 0.854894524), (-1.823540048, 0.823436889), (-1.793554178, 0.104979402), (-1.763568309, -0.613478086), (-1.141657158, -0.577741646)],
                knots=[3.181025595, 3.181025595, 3.181025595, 4.754799698, 4.754799698, 6.328573801, 6.328573801, 6.328573801], degree=2, weights=[1, 0.706053195, 1, 0.706053195, 1]))
            add(Edge.make_bspline(
                [(-0.645165584, 0.487388037), (-0.79140441, 0.900606071), (-1.201450314, 0.854894524)],
                knots=[2.404042441, 2.404042441, 2.404042441, 3.565685694, 3.565685694, 3.565685694], degree=2, weights=[1, 0.836012096, 1]))
            ThreePointArc((-0.645165584, 0.487388037), (-0.621252025, 0.455787841), (-0.583484164, 0.443787032))
        make_face()
        with BuildLine():
            Line((-3.89178871, 0.443787032), (-2.955953786, 0.443787032))
            ThreePointArc((-2.955953786, 0.443787032), (-2.937643536, 0.451874816), (-2.926709688, 0.468641703))
            ThreePointArc((-2.926709688, 0.468641703), (-2.923523234, 0.512633483), (-2.930898247, 0.556119567))
            ThreePointArc((-2.930898247, 0.556119567), (-2.991346096, 0.689104808), (-3.068060358, 0.81341868))
            add(Edge.make_bspline(
                [(-3.068060358, 0.81341868), (-3.48635792, 1.454553053), (-4.429159392, 1.454553053)],
                knots=[0.342748392, 0.342748392, 0.342748392, 1.381331695, 1.381331695, 1.381331695], degree=2, weights=[1, 0.868170926, 1]))
            Line((-4.429159392, 1.454553053), (-4.522780446, 1.454553068))
            add(Edge.make_bspline(
                [(-4.522780446, 1.454553068), (-6.108437307, 1.454553068), (-6.108437307, 0.203397992)],
                knots=[4.81203319, 4.81203319, 4.81203319, 6.344970327, 6.344970327, 6.344970327], degree=2, weights=[1, 0.720364542, 1]))
            Line((-6.108437307, 0.203397992), (-6.108437352, 0.073267738))
            add(Edge.make_bspline(
                [(-6.108437352, 0.073267738), (-6.108437352, -1.177887338), (-4.52278049, -1.177887338)],
                knots=[3.079807634, 3.079807634, 3.079807634, 4.612744771, 4.612744771, 4.612744771], degree=2, weights=[1, 0.720364542, 1]))
            Line((-4.52278049, -1.177887338), (-4.429159437, -1.177887375))
            add(Edge.make_bspline(
                [(-4.429159437, -1.177887375), (-3.486357965, -1.177887375), (-3.068060402, -0.536753002)],
                knots=[1.760260959, 1.760260959, 1.760260959, 2.798844261, 2.798844261, 2.798844261], degree=2, weights=[1, 0.868170926, 1]))
            ThreePointArc((-3.068060402, -0.536753002), (-2.994310308, -0.417650167), (-2.935646337, -0.290437354))
            ThreePointArc((-2.935646337, -0.290437354), (-2.92405335, -0.24211404), (-2.925815458, -0.192450825))
            ThreePointArc((-2.925815458, -0.192450825), (-2.937820019, -0.171527836), (-2.960480033, -0.163257123))
            Line((-2.960480033, -0.163257123), (-3.891788755, -0.163257123))
            ThreePointArc((-3.891788755, -0.163257123), (-3.929556585, -0.175257922), (-3.953470124, -0.206858093))
            add(Edge.make_bspline(
                [(-4.449961703, -0.577741646), (-4.084853792, -0.578100851), (-3.953470124, -0.206858093)],
                knots=[5.955155363, 5.955155363, 5.955155363, 7.020735545, 7.020735545, 7.020735545], degree=2, weights=[1, 0.86139323, 1]))
            add(Edge.make_bspline(
                [(-4.509754859, 0.854894524), (-5.131844593, 0.82343689), (-5.101858724, 0.104979402), (-5.071872854, -0.613478086), (-4.449961703, -0.577741646)],
                knots=[3.181025595, 3.181025595, 3.181025595, 4.754799698, 4.754799698, 6.328573801, 6.328573801, 6.328573801], degree=2, weights=[1, 0.706053195, 1, 0.706053195, 1]))
            add(Edge.make_bspline(
                [(-3.95347013, 0.487388037), (-4.099708956, 0.900606071), (-4.509754859, 0.854894524)],
                knots=[2.40404244, 2.40404244, 2.40404244, 3.565685694, 3.565685694, 3.565685694], degree=2, weights=[1, 0.836012096, 1]))
            ThreePointArc((-3.95347013, 0.487388037), (-3.92955657, 0.455787841), (-3.89178871, 0.443787032))
        make_face()
    extrude(amount=CUT_EXTRUDE3_DEPTH, mode=Mode.SUBTRACT)


solid = part.part
